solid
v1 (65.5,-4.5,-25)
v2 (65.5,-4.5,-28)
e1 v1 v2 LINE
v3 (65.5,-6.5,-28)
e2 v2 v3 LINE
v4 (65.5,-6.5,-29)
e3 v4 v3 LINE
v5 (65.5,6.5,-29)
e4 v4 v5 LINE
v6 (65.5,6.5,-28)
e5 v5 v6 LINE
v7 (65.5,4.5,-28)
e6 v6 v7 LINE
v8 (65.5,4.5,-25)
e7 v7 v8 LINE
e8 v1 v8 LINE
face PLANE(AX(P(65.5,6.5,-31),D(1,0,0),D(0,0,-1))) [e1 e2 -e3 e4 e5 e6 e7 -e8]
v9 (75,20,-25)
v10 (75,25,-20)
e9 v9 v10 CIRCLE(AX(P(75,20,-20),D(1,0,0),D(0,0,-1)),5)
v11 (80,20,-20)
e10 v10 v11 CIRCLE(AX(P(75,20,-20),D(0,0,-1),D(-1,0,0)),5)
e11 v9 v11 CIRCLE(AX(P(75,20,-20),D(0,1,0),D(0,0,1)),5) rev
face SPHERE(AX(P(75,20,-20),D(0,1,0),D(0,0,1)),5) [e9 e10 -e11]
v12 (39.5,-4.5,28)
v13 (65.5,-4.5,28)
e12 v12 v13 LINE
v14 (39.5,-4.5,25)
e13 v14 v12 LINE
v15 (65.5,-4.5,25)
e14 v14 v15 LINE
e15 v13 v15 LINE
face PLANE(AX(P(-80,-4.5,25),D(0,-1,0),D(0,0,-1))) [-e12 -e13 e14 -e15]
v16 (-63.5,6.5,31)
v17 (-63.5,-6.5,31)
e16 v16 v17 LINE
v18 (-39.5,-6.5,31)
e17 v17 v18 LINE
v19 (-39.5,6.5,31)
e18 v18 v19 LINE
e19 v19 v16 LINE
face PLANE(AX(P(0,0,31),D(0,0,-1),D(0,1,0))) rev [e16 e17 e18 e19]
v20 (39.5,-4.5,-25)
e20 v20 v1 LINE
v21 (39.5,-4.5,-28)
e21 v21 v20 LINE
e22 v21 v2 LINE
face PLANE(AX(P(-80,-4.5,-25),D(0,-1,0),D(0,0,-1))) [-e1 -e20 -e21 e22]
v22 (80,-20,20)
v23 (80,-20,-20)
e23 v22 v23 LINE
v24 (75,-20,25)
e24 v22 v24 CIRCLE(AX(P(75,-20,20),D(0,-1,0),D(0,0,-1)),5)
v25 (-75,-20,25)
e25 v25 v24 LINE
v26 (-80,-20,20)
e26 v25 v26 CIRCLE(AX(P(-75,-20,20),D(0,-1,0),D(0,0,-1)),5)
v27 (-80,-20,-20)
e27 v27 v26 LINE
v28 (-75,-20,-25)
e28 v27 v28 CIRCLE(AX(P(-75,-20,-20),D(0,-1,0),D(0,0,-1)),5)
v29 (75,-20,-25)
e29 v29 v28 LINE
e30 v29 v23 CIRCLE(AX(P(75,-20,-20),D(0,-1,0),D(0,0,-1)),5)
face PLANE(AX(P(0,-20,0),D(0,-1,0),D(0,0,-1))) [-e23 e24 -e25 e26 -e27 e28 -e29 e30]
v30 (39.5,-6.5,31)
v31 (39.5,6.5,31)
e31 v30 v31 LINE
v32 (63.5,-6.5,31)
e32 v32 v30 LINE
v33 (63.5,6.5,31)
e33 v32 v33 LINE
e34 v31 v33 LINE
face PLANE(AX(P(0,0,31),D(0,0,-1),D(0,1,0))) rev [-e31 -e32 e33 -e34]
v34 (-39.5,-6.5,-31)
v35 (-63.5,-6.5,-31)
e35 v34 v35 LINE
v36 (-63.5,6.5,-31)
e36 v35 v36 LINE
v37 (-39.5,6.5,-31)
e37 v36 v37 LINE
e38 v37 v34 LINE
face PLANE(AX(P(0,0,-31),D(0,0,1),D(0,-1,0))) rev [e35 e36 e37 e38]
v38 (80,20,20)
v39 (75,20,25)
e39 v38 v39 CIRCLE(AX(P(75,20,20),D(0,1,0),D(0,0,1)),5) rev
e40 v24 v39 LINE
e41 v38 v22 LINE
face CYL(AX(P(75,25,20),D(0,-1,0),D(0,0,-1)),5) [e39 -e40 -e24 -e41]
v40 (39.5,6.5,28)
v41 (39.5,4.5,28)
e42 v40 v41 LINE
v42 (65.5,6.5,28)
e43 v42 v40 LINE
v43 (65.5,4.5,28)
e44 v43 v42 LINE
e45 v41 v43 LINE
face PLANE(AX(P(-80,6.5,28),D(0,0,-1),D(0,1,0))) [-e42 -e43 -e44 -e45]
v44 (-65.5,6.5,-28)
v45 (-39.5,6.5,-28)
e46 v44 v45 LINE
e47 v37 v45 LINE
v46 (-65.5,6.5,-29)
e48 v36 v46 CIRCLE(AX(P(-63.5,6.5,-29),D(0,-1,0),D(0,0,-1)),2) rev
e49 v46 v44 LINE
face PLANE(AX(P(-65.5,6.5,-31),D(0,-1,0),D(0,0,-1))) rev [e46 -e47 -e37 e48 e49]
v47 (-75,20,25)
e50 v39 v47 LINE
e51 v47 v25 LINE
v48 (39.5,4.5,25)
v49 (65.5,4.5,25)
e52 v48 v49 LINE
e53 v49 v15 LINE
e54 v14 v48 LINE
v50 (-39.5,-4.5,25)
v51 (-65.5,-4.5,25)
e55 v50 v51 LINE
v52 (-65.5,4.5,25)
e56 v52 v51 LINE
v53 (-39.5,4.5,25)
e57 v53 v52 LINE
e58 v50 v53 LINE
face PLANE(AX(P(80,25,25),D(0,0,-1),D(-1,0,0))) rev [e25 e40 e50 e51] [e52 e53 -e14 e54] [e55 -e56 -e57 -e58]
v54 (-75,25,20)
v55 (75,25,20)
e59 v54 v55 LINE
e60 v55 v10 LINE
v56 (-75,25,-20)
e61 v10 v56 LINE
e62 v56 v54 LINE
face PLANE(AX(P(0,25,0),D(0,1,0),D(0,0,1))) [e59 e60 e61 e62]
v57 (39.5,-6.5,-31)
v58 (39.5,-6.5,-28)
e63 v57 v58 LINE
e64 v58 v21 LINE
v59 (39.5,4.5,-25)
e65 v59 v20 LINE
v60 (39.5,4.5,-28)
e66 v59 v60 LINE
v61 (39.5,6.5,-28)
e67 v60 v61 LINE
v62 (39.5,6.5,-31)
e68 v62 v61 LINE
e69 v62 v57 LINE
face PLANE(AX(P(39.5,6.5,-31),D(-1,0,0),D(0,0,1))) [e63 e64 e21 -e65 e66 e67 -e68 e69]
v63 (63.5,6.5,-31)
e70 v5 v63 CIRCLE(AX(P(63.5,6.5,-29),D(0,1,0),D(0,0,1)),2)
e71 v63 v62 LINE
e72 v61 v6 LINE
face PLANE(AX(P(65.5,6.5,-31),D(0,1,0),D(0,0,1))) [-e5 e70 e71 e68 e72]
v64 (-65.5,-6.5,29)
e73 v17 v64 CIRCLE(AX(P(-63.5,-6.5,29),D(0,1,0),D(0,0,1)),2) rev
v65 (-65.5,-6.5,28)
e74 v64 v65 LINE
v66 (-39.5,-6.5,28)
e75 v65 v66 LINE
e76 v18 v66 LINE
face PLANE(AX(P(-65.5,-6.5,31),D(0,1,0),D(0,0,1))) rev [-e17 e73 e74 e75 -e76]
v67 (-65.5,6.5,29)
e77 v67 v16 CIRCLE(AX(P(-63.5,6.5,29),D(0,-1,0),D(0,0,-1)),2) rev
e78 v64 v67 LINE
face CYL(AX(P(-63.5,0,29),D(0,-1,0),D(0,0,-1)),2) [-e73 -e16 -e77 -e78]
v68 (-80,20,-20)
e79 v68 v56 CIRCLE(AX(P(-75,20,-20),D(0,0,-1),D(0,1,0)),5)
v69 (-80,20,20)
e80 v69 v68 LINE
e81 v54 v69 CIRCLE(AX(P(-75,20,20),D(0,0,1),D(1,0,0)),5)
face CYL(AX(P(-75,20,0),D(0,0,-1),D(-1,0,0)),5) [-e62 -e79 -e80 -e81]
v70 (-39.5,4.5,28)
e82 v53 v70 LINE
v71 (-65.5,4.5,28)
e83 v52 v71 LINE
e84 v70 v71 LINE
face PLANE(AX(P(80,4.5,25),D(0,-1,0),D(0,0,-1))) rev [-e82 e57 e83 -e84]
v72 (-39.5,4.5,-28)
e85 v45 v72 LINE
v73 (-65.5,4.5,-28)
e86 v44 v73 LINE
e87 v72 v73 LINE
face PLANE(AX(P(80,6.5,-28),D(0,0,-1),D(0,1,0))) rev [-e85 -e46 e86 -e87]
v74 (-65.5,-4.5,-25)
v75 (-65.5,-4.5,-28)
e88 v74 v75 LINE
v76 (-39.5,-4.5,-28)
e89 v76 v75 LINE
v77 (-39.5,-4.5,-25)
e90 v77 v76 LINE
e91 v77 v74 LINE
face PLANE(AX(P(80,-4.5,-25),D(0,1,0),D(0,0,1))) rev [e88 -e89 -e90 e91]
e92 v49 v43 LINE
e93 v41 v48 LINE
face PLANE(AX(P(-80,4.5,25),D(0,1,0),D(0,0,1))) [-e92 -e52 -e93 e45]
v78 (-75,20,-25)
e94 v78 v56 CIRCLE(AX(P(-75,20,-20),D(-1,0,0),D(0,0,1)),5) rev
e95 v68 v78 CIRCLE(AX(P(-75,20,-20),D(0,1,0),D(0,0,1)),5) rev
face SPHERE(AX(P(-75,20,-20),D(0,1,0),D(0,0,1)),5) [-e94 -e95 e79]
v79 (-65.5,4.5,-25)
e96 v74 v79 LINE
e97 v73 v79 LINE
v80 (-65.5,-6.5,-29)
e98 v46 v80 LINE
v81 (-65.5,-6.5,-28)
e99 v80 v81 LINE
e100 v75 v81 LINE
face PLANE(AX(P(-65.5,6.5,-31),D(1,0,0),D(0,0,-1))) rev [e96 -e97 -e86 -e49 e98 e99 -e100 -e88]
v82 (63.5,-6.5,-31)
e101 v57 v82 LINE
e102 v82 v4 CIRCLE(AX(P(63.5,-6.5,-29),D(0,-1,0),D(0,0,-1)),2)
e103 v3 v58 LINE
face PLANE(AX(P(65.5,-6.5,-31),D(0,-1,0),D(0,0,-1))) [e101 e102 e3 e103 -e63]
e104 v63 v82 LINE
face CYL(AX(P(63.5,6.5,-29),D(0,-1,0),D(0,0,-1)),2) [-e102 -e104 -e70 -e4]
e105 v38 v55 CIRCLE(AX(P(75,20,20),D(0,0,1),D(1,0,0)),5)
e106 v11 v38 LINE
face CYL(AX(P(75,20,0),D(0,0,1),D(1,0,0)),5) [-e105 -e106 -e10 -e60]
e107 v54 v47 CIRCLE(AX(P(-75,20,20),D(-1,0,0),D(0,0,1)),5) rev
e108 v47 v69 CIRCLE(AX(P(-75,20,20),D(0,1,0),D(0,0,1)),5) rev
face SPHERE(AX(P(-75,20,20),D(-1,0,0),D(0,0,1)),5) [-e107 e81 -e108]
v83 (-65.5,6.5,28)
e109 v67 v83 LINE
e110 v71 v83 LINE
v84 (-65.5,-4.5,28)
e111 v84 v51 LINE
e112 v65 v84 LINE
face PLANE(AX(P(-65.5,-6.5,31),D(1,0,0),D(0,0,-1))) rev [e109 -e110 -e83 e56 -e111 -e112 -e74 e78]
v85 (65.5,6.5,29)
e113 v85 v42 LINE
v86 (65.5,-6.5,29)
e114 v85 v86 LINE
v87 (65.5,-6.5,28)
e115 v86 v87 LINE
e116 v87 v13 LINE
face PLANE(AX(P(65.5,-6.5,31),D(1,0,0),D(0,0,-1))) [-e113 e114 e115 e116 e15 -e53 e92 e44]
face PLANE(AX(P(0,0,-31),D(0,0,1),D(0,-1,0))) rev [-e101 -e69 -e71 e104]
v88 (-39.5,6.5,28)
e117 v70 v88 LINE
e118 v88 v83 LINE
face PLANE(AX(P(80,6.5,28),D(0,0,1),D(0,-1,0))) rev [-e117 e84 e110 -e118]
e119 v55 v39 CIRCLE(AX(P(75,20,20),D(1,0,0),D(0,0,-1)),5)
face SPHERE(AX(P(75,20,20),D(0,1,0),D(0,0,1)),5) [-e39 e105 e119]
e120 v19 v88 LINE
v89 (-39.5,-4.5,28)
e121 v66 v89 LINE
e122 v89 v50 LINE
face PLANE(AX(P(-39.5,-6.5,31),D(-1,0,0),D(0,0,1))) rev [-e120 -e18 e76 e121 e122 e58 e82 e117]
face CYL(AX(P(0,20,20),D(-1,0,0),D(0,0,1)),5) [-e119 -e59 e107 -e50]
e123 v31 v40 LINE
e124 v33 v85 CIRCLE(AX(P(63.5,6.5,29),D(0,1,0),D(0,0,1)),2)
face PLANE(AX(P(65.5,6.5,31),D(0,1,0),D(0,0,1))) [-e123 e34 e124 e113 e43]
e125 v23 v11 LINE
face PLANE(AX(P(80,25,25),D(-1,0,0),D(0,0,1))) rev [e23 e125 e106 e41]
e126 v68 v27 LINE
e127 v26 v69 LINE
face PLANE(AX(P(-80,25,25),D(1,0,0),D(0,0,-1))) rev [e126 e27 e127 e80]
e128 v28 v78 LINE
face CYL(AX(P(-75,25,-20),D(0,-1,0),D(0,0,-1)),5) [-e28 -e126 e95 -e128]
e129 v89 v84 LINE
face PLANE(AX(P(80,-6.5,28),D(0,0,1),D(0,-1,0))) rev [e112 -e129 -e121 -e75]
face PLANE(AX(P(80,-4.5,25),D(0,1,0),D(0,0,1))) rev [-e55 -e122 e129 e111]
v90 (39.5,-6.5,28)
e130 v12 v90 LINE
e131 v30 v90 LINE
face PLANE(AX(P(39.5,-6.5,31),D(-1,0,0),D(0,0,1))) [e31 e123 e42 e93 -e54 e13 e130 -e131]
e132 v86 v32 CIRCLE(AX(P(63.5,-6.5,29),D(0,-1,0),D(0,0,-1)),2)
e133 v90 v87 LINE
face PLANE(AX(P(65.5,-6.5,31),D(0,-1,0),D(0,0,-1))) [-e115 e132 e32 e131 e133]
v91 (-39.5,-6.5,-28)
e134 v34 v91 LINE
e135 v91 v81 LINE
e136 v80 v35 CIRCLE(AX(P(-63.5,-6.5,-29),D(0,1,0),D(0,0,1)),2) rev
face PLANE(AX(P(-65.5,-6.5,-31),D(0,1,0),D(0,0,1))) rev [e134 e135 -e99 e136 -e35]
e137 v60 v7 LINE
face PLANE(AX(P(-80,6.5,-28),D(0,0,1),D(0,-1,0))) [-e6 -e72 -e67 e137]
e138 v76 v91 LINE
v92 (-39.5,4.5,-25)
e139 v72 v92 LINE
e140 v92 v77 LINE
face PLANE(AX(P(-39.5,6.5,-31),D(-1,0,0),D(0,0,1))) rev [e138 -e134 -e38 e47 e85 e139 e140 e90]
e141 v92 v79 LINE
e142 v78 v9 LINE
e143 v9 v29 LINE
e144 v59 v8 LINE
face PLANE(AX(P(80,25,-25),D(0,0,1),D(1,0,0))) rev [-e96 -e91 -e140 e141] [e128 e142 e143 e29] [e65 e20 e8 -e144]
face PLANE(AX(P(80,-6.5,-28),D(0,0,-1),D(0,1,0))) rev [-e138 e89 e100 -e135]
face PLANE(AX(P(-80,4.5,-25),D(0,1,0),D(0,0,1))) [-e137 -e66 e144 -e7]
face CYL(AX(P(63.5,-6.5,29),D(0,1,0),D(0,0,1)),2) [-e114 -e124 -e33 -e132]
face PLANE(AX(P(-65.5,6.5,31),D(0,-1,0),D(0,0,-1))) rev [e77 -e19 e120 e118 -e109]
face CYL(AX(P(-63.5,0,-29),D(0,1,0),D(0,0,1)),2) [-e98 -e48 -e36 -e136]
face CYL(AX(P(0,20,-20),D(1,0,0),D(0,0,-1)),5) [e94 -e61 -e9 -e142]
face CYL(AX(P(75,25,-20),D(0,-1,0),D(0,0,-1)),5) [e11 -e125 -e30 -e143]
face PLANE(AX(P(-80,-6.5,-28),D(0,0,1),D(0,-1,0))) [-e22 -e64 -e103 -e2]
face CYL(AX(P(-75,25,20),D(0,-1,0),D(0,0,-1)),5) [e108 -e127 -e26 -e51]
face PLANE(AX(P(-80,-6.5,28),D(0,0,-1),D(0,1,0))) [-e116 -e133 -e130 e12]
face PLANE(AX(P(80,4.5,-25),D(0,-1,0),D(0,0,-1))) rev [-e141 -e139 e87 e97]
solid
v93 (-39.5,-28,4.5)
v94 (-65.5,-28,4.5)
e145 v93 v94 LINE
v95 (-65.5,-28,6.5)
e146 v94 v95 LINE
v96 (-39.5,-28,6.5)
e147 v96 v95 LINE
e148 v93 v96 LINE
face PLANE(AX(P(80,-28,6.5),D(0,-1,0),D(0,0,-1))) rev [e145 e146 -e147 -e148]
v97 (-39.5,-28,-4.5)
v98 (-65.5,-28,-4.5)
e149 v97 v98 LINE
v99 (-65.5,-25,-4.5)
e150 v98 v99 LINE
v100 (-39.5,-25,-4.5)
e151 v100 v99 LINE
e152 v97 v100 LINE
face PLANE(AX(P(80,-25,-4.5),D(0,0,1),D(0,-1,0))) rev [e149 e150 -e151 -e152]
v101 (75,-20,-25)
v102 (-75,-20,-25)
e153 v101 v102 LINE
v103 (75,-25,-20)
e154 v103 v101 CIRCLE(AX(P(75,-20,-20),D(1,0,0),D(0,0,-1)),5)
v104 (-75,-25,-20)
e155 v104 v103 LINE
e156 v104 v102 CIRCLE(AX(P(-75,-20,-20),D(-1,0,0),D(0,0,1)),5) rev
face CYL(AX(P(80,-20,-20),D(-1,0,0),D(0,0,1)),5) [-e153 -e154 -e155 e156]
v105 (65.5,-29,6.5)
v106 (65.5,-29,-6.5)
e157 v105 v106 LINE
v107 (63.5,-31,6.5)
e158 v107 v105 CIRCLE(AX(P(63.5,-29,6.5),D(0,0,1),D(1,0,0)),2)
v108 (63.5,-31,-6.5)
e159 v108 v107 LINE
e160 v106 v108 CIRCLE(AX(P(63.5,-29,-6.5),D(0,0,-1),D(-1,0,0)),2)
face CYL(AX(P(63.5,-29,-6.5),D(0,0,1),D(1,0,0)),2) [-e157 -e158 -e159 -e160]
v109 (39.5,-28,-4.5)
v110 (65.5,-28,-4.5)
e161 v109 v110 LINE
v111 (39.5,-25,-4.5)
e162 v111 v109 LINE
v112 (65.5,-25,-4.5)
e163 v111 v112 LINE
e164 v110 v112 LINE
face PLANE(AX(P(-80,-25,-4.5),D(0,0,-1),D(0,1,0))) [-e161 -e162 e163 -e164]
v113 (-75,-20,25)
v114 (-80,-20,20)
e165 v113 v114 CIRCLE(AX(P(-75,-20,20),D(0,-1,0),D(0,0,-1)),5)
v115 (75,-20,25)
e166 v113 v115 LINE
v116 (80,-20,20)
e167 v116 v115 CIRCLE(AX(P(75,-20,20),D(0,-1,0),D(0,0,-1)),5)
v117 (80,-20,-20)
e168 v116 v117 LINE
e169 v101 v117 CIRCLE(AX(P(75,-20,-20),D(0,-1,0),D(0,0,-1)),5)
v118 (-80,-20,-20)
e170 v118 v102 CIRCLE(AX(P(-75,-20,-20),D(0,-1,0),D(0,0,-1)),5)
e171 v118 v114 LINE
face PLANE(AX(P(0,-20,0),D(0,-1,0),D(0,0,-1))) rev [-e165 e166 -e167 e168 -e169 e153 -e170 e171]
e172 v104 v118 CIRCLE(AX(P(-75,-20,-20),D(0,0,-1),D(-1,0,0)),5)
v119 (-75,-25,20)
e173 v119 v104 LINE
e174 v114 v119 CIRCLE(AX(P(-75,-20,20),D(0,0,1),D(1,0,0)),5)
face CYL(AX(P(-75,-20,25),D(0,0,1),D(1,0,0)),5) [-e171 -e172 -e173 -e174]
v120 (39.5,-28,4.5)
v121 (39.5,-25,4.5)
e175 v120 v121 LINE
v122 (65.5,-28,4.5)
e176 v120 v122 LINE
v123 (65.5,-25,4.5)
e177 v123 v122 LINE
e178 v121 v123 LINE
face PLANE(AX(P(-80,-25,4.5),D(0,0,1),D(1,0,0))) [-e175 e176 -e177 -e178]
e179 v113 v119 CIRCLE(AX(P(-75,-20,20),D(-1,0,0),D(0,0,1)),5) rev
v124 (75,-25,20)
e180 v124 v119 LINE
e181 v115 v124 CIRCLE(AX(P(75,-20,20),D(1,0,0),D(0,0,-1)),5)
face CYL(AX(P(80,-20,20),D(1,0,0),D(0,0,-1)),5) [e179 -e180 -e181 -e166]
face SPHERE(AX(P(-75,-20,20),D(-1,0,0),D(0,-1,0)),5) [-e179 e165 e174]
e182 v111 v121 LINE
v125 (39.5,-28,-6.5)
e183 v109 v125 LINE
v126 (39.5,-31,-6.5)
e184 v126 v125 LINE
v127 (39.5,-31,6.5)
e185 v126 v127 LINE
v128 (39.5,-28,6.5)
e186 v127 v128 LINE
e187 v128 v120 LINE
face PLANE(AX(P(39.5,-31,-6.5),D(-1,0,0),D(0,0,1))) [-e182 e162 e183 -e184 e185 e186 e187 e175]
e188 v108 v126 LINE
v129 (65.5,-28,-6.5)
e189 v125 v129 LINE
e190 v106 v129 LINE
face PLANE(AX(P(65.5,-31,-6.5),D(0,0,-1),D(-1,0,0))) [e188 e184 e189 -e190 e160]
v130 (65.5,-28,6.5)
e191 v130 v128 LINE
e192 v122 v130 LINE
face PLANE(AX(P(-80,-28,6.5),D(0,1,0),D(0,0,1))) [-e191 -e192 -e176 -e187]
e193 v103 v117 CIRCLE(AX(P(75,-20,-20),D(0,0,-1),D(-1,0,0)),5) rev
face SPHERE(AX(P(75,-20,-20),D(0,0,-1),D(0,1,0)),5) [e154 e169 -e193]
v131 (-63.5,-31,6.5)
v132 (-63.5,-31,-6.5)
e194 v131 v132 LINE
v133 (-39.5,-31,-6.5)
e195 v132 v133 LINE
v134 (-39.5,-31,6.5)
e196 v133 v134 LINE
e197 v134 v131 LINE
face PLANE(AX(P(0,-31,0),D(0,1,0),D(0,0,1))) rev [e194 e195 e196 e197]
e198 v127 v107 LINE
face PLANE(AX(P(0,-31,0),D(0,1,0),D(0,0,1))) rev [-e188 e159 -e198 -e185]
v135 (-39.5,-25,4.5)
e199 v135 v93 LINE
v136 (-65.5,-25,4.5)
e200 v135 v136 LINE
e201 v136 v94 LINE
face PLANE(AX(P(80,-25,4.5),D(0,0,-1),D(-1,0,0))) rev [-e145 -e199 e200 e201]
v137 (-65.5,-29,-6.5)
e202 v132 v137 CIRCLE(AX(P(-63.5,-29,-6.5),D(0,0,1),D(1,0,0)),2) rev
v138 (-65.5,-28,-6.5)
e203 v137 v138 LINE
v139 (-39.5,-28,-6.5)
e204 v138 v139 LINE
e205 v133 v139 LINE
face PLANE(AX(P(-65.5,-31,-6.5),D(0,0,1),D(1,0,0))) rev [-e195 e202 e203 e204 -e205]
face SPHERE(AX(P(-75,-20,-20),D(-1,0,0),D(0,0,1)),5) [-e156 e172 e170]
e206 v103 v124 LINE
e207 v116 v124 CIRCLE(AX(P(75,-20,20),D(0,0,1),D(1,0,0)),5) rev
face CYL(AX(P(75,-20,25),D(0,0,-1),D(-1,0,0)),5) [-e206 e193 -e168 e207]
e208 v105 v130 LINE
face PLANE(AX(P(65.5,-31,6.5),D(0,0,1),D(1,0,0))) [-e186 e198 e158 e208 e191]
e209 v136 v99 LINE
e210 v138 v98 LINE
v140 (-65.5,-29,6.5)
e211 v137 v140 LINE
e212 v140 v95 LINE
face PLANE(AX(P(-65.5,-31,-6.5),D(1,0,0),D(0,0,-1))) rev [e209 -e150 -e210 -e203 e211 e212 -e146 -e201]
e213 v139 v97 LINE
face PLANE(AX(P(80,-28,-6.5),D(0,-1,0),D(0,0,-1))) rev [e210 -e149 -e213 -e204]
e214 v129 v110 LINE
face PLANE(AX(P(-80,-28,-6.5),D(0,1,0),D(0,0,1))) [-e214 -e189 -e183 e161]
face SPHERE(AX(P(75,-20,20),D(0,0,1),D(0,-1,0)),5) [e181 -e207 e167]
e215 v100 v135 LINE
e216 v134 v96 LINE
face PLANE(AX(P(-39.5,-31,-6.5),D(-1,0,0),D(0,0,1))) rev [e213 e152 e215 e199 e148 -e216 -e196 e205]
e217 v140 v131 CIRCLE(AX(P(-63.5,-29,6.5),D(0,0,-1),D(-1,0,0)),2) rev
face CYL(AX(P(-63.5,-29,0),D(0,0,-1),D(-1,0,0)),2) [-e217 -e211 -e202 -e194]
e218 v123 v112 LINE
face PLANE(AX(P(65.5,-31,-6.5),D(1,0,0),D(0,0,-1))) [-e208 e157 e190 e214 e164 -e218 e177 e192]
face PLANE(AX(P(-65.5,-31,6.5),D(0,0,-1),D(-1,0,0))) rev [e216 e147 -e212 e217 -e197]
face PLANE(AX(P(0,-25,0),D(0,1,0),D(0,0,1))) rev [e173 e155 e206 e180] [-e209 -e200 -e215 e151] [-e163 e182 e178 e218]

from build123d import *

# Parameters (mm, degrees)
SKETCH1_W                = 160
SKETCH1_H                = 50
BOSS_EXTRUDE1_DEPTH      = 25
SKETCH2_W                = 26
SKETCH2_H                = 13
CONNECTOR_BASE_DEPTH     = 6
SKETCH3_W                = 2
SKETCH3_H                = 3
DOVETAIL_CUT_DEPTH       = 151.851748415
FILLET1_R                = 2
CIRPATTERN1_COUNT        = 4
FILLET1_OF_CIRPATTERN1_R = 2
MIRROR1_START            = -4.5
MIRROR1_DEPTH            = 9
MIRROR1_START_2          = -6.5
MIRROR1_2_DEPTH          = 13
MIRROR1_3_DEPTH          = 9
MIRROR1_4_DEPTH          = 13
FILLET2_R                = 5
SKETCH4_W                = 150
SKETCH4_H                = 40
CUT_EXTRUDE1_DEPTH       = 6


# Read off the part's stored shape, not the designer's step: Mirror1
with BuildPart() as part:
    # Sketch1 → Boss-Extrude1 (new, symmetric)
    with BuildSketch(Plane(origin=(0, 0, 0), x_dir=(1, 0, 0), z_dir=(0, 1, 0))):
        Rectangle(SKETCH1_W, SKETCH1_H)
    extrude(amount=BOSS_EXTRUDE1_DEPTH, both=True)

    # Sketch2 → connector base (add)
    with BuildSketch(Plane(origin=(0, 25, 0), x_dir=(1, 0, 0), z_dir=(0, 1, 0))):
        with Locations((-52.5, 0)):
            Rectangle(SKETCH2_W, SKETCH2_H)
    connector_base = extrude(amount=CONNECTOR_BASE_DEPTH)

    # Sketch3 → dovetail cut (cut, through all)
    with BuildSketch(Plane.ZY.offset(65.5)):
        with Locations((5.5, 26.5)):
            Rectangle(SKETCH3_W, SKETCH3_H)
        with Locations((-5.5, 26.5)):
            Rectangle(SKETCH3_W, SKETCH3_H)
    dovetail_cut = extrude(amount=-DOVETAIL_CUT_DEPTH, mode=Mode.SUBTRACT)

    # Fillet1
    fillet1_edges = [part.edges().sort_by_distance(p)[0] for p in [
        (-65.5, 31, 0),
    ]]
    fillet(fillet1_edges, radius=FILLET1_R)

    # CirPattern1: connector base, dovetail cut ×4 about axis
    cirpattern1_axis = Axis((0, 0, 0), (1, 0, 0))
    add([connector_base.rotate(cirpattern1_axis, i * 360 / CIRPATTERN1_COUNT) for i in range(1, CIRPATTERN1_COUNT)])
    add([dovetail_cut.rotate(cirpattern1_axis, i * 360 / CIRPATTERN1_COUNT) for i in range(1, CIRPATTERN1_COUNT)], mode=Mode.SUBTRACT)

    # Fillet1 of CirPattern1
    fillet1_of_cirpattern1_edges = [part.edges().sort_by_distance(p)[0] for p in [
        (-65.5, 0, 31),
        (-65.5, -31, 0),
        (-65.5, 0, -31),
    ]]
    fillet(fillet1_of_cirpattern1_edges, radius=FILLET1_OF_CIRPATTERN1_R)

    # Mirror1 outline → Mirror1 (add)
    with BuildSketch(Plane.XY.offset(MIRROR1_START)):
        with BuildLine():
            Line((63.5, 31), (39.5, 31))
            Line((39.5, 31), (39.5, 25))
            Line((39.5, 25), (65.5, 25))
            Line((65.5, 25), (65.5, 29))
            ThreePointArc((65.5, 29), (64.914213562, 30.414213562), (63.5, 31))
        make_face()
        with BuildLine():
            Line((65.5, -25), (39.5, -25))
            Line((39.5, -25), (39.5, -31))
            Line((39.5, -31), (63.5, -31))
            ThreePointArc((63.5, -31), (64.914213562, -30.414213562), (65.5, -29))
            Line((65.5, -29), (65.5, -25))
        make_face()
    extrude(amount=MIRROR1_DEPTH)

    # Mirror1 2 outline → Mirror1 2 (add)
    with BuildSketch(Plane.XY.offset(MIRROR1_START_2)):
        with BuildLine():
            Line((63.5, 31), (39.5, 31))
            Line((39.5, 31), (39.5, 28))
            Line((39.5, 28), (65.5, 28))
            Line((65.5, 28), (65.5, 29))
            ThreePointArc((65.5, 29), (64.914213562, 30.414213562), (63.5, 31))
        make_face()
        with BuildLine():
            Line((65.5, -28), (39.5, -28))
            Line((39.5, -28), (39.5, -31))
            Line((39.5, -31), (63.5, -31))
            ThreePointArc((63.5, -31), (64.914213562, -30.414213562), (65.5, -29))
            Line((65.5, -29), (65.5, -28))
        make_face()
    extrude(amount=MIRROR1_2_DEPTH)

    # Mirror1 3 outline → Mirror1 3 (add)
    with BuildSketch(Plane(origin=(0, 0, 0), x_dir=(1, 0, 0), z_dir=(0, 1, 0)).offset(MIRROR1_START)):
        with BuildLine():
            Line((63.5, 31), (39.5, 31))
            Line((39.5, 31), (39.5, 25))
            Line((39.5, 25), (65.5, 25))
            Line((65.5, 25), (65.5, 29))
            ThreePointArc((65.5, 29), (64.914213562, 30.414213562), (63.5, 31))
        make_face()
        with BuildLine():
            Line((65.5, -25), (39.5, -25))
            Line((39.5, -25), (39.5, -31))
            Line((39.5, -31), (63.5, -31))
            ThreePointArc((63.5, -31), (64.914213562, -30.414213562), (65.5, -29))
            Line((65.5, -29), (65.5, -25))
        make_face()
    extrude(amount=MIRROR1_3_DEPTH)

    # Mirror1 4 outline → Mirror1 4 (add)
    with BuildSketch(Plane(origin=(0, 0, 0), x_dir=(1, 0, 0), z_dir=(0, 1, 0)).offset(MIRROR1_START_2)):
        with BuildLine():
            Line((63.5, 31), (39.5, 31))
            Line((39.5, 31), (39.5, 28))
            Line((39.5, 28), (65.5, 28))
            Line((65.5, 28), (65.5, 29))
            ThreePointArc((65.5, 29), (64.914213562, 30.414213562), (63.5, 31))
        make_face()
        with BuildLine():
            Line((65.5, -28), (39.5, -28))
            Line((39.5, -28), (39.5, -31))
            Line((39.5, -31), (63.5, -31))
            ThreePointArc((63.5, -31), (64.914213562, -30.414213562), (65.5, -29))
            Line((65.5, -29), (65.5, -28))
        make_face()
    extrude(amount=MIRROR1_4_DEPTH)

    # Fillet2
    fillet2_edges = [part.edges().sort_by_distance(p)[0] for p in [
        (80, 25, 0),
        (0, 25, -25),
        (-80, 25, 0),
        (0, -25, -25),
        (80, -25, 0),
        (0, -25, 25),
        (-80, -25, 0),
        (-80, 0, -25),
        (80, 0, -25),
        (80, 0, 25),
        (-80, 0, 25),
        (0, 25, 25),
    ]]
    fillet(fillet2_edges, radius=FILLET2_R)

    # Sketch4 → Cut-Extrude1 (cut)
    with BuildSketch(Plane(origin=(0, 31, 0), x_dir=(1, 0, 0), z_dir=(0, 1, 0))):
        Rectangle(SKETCH4_W, SKETCH4_H)
    extrude(amount=-CUT_EXTRUDE1_DEPTH, mode=Mode.SUBTRACT)


with BuildPart() as body_2:
    # Split1: the piece on the far side of the plane
    add(part.part)
    split(bisect_by=Plane(origin=(0, -20, 0), x_dir=(0, 0, -1), z_dir=(0, -1, 0)), keep=Keep.BOTTOM)


with BuildPart() as part_1:
    add(part.part)

    # Split1
    split(bisect_by=Plane(origin=(0, -20, 0), x_dir=(0, 0, -1), z_dir=(0, -1, 0)), keep=Keep.TOP)


solid = Compound([body_2.part, part_1.part])
